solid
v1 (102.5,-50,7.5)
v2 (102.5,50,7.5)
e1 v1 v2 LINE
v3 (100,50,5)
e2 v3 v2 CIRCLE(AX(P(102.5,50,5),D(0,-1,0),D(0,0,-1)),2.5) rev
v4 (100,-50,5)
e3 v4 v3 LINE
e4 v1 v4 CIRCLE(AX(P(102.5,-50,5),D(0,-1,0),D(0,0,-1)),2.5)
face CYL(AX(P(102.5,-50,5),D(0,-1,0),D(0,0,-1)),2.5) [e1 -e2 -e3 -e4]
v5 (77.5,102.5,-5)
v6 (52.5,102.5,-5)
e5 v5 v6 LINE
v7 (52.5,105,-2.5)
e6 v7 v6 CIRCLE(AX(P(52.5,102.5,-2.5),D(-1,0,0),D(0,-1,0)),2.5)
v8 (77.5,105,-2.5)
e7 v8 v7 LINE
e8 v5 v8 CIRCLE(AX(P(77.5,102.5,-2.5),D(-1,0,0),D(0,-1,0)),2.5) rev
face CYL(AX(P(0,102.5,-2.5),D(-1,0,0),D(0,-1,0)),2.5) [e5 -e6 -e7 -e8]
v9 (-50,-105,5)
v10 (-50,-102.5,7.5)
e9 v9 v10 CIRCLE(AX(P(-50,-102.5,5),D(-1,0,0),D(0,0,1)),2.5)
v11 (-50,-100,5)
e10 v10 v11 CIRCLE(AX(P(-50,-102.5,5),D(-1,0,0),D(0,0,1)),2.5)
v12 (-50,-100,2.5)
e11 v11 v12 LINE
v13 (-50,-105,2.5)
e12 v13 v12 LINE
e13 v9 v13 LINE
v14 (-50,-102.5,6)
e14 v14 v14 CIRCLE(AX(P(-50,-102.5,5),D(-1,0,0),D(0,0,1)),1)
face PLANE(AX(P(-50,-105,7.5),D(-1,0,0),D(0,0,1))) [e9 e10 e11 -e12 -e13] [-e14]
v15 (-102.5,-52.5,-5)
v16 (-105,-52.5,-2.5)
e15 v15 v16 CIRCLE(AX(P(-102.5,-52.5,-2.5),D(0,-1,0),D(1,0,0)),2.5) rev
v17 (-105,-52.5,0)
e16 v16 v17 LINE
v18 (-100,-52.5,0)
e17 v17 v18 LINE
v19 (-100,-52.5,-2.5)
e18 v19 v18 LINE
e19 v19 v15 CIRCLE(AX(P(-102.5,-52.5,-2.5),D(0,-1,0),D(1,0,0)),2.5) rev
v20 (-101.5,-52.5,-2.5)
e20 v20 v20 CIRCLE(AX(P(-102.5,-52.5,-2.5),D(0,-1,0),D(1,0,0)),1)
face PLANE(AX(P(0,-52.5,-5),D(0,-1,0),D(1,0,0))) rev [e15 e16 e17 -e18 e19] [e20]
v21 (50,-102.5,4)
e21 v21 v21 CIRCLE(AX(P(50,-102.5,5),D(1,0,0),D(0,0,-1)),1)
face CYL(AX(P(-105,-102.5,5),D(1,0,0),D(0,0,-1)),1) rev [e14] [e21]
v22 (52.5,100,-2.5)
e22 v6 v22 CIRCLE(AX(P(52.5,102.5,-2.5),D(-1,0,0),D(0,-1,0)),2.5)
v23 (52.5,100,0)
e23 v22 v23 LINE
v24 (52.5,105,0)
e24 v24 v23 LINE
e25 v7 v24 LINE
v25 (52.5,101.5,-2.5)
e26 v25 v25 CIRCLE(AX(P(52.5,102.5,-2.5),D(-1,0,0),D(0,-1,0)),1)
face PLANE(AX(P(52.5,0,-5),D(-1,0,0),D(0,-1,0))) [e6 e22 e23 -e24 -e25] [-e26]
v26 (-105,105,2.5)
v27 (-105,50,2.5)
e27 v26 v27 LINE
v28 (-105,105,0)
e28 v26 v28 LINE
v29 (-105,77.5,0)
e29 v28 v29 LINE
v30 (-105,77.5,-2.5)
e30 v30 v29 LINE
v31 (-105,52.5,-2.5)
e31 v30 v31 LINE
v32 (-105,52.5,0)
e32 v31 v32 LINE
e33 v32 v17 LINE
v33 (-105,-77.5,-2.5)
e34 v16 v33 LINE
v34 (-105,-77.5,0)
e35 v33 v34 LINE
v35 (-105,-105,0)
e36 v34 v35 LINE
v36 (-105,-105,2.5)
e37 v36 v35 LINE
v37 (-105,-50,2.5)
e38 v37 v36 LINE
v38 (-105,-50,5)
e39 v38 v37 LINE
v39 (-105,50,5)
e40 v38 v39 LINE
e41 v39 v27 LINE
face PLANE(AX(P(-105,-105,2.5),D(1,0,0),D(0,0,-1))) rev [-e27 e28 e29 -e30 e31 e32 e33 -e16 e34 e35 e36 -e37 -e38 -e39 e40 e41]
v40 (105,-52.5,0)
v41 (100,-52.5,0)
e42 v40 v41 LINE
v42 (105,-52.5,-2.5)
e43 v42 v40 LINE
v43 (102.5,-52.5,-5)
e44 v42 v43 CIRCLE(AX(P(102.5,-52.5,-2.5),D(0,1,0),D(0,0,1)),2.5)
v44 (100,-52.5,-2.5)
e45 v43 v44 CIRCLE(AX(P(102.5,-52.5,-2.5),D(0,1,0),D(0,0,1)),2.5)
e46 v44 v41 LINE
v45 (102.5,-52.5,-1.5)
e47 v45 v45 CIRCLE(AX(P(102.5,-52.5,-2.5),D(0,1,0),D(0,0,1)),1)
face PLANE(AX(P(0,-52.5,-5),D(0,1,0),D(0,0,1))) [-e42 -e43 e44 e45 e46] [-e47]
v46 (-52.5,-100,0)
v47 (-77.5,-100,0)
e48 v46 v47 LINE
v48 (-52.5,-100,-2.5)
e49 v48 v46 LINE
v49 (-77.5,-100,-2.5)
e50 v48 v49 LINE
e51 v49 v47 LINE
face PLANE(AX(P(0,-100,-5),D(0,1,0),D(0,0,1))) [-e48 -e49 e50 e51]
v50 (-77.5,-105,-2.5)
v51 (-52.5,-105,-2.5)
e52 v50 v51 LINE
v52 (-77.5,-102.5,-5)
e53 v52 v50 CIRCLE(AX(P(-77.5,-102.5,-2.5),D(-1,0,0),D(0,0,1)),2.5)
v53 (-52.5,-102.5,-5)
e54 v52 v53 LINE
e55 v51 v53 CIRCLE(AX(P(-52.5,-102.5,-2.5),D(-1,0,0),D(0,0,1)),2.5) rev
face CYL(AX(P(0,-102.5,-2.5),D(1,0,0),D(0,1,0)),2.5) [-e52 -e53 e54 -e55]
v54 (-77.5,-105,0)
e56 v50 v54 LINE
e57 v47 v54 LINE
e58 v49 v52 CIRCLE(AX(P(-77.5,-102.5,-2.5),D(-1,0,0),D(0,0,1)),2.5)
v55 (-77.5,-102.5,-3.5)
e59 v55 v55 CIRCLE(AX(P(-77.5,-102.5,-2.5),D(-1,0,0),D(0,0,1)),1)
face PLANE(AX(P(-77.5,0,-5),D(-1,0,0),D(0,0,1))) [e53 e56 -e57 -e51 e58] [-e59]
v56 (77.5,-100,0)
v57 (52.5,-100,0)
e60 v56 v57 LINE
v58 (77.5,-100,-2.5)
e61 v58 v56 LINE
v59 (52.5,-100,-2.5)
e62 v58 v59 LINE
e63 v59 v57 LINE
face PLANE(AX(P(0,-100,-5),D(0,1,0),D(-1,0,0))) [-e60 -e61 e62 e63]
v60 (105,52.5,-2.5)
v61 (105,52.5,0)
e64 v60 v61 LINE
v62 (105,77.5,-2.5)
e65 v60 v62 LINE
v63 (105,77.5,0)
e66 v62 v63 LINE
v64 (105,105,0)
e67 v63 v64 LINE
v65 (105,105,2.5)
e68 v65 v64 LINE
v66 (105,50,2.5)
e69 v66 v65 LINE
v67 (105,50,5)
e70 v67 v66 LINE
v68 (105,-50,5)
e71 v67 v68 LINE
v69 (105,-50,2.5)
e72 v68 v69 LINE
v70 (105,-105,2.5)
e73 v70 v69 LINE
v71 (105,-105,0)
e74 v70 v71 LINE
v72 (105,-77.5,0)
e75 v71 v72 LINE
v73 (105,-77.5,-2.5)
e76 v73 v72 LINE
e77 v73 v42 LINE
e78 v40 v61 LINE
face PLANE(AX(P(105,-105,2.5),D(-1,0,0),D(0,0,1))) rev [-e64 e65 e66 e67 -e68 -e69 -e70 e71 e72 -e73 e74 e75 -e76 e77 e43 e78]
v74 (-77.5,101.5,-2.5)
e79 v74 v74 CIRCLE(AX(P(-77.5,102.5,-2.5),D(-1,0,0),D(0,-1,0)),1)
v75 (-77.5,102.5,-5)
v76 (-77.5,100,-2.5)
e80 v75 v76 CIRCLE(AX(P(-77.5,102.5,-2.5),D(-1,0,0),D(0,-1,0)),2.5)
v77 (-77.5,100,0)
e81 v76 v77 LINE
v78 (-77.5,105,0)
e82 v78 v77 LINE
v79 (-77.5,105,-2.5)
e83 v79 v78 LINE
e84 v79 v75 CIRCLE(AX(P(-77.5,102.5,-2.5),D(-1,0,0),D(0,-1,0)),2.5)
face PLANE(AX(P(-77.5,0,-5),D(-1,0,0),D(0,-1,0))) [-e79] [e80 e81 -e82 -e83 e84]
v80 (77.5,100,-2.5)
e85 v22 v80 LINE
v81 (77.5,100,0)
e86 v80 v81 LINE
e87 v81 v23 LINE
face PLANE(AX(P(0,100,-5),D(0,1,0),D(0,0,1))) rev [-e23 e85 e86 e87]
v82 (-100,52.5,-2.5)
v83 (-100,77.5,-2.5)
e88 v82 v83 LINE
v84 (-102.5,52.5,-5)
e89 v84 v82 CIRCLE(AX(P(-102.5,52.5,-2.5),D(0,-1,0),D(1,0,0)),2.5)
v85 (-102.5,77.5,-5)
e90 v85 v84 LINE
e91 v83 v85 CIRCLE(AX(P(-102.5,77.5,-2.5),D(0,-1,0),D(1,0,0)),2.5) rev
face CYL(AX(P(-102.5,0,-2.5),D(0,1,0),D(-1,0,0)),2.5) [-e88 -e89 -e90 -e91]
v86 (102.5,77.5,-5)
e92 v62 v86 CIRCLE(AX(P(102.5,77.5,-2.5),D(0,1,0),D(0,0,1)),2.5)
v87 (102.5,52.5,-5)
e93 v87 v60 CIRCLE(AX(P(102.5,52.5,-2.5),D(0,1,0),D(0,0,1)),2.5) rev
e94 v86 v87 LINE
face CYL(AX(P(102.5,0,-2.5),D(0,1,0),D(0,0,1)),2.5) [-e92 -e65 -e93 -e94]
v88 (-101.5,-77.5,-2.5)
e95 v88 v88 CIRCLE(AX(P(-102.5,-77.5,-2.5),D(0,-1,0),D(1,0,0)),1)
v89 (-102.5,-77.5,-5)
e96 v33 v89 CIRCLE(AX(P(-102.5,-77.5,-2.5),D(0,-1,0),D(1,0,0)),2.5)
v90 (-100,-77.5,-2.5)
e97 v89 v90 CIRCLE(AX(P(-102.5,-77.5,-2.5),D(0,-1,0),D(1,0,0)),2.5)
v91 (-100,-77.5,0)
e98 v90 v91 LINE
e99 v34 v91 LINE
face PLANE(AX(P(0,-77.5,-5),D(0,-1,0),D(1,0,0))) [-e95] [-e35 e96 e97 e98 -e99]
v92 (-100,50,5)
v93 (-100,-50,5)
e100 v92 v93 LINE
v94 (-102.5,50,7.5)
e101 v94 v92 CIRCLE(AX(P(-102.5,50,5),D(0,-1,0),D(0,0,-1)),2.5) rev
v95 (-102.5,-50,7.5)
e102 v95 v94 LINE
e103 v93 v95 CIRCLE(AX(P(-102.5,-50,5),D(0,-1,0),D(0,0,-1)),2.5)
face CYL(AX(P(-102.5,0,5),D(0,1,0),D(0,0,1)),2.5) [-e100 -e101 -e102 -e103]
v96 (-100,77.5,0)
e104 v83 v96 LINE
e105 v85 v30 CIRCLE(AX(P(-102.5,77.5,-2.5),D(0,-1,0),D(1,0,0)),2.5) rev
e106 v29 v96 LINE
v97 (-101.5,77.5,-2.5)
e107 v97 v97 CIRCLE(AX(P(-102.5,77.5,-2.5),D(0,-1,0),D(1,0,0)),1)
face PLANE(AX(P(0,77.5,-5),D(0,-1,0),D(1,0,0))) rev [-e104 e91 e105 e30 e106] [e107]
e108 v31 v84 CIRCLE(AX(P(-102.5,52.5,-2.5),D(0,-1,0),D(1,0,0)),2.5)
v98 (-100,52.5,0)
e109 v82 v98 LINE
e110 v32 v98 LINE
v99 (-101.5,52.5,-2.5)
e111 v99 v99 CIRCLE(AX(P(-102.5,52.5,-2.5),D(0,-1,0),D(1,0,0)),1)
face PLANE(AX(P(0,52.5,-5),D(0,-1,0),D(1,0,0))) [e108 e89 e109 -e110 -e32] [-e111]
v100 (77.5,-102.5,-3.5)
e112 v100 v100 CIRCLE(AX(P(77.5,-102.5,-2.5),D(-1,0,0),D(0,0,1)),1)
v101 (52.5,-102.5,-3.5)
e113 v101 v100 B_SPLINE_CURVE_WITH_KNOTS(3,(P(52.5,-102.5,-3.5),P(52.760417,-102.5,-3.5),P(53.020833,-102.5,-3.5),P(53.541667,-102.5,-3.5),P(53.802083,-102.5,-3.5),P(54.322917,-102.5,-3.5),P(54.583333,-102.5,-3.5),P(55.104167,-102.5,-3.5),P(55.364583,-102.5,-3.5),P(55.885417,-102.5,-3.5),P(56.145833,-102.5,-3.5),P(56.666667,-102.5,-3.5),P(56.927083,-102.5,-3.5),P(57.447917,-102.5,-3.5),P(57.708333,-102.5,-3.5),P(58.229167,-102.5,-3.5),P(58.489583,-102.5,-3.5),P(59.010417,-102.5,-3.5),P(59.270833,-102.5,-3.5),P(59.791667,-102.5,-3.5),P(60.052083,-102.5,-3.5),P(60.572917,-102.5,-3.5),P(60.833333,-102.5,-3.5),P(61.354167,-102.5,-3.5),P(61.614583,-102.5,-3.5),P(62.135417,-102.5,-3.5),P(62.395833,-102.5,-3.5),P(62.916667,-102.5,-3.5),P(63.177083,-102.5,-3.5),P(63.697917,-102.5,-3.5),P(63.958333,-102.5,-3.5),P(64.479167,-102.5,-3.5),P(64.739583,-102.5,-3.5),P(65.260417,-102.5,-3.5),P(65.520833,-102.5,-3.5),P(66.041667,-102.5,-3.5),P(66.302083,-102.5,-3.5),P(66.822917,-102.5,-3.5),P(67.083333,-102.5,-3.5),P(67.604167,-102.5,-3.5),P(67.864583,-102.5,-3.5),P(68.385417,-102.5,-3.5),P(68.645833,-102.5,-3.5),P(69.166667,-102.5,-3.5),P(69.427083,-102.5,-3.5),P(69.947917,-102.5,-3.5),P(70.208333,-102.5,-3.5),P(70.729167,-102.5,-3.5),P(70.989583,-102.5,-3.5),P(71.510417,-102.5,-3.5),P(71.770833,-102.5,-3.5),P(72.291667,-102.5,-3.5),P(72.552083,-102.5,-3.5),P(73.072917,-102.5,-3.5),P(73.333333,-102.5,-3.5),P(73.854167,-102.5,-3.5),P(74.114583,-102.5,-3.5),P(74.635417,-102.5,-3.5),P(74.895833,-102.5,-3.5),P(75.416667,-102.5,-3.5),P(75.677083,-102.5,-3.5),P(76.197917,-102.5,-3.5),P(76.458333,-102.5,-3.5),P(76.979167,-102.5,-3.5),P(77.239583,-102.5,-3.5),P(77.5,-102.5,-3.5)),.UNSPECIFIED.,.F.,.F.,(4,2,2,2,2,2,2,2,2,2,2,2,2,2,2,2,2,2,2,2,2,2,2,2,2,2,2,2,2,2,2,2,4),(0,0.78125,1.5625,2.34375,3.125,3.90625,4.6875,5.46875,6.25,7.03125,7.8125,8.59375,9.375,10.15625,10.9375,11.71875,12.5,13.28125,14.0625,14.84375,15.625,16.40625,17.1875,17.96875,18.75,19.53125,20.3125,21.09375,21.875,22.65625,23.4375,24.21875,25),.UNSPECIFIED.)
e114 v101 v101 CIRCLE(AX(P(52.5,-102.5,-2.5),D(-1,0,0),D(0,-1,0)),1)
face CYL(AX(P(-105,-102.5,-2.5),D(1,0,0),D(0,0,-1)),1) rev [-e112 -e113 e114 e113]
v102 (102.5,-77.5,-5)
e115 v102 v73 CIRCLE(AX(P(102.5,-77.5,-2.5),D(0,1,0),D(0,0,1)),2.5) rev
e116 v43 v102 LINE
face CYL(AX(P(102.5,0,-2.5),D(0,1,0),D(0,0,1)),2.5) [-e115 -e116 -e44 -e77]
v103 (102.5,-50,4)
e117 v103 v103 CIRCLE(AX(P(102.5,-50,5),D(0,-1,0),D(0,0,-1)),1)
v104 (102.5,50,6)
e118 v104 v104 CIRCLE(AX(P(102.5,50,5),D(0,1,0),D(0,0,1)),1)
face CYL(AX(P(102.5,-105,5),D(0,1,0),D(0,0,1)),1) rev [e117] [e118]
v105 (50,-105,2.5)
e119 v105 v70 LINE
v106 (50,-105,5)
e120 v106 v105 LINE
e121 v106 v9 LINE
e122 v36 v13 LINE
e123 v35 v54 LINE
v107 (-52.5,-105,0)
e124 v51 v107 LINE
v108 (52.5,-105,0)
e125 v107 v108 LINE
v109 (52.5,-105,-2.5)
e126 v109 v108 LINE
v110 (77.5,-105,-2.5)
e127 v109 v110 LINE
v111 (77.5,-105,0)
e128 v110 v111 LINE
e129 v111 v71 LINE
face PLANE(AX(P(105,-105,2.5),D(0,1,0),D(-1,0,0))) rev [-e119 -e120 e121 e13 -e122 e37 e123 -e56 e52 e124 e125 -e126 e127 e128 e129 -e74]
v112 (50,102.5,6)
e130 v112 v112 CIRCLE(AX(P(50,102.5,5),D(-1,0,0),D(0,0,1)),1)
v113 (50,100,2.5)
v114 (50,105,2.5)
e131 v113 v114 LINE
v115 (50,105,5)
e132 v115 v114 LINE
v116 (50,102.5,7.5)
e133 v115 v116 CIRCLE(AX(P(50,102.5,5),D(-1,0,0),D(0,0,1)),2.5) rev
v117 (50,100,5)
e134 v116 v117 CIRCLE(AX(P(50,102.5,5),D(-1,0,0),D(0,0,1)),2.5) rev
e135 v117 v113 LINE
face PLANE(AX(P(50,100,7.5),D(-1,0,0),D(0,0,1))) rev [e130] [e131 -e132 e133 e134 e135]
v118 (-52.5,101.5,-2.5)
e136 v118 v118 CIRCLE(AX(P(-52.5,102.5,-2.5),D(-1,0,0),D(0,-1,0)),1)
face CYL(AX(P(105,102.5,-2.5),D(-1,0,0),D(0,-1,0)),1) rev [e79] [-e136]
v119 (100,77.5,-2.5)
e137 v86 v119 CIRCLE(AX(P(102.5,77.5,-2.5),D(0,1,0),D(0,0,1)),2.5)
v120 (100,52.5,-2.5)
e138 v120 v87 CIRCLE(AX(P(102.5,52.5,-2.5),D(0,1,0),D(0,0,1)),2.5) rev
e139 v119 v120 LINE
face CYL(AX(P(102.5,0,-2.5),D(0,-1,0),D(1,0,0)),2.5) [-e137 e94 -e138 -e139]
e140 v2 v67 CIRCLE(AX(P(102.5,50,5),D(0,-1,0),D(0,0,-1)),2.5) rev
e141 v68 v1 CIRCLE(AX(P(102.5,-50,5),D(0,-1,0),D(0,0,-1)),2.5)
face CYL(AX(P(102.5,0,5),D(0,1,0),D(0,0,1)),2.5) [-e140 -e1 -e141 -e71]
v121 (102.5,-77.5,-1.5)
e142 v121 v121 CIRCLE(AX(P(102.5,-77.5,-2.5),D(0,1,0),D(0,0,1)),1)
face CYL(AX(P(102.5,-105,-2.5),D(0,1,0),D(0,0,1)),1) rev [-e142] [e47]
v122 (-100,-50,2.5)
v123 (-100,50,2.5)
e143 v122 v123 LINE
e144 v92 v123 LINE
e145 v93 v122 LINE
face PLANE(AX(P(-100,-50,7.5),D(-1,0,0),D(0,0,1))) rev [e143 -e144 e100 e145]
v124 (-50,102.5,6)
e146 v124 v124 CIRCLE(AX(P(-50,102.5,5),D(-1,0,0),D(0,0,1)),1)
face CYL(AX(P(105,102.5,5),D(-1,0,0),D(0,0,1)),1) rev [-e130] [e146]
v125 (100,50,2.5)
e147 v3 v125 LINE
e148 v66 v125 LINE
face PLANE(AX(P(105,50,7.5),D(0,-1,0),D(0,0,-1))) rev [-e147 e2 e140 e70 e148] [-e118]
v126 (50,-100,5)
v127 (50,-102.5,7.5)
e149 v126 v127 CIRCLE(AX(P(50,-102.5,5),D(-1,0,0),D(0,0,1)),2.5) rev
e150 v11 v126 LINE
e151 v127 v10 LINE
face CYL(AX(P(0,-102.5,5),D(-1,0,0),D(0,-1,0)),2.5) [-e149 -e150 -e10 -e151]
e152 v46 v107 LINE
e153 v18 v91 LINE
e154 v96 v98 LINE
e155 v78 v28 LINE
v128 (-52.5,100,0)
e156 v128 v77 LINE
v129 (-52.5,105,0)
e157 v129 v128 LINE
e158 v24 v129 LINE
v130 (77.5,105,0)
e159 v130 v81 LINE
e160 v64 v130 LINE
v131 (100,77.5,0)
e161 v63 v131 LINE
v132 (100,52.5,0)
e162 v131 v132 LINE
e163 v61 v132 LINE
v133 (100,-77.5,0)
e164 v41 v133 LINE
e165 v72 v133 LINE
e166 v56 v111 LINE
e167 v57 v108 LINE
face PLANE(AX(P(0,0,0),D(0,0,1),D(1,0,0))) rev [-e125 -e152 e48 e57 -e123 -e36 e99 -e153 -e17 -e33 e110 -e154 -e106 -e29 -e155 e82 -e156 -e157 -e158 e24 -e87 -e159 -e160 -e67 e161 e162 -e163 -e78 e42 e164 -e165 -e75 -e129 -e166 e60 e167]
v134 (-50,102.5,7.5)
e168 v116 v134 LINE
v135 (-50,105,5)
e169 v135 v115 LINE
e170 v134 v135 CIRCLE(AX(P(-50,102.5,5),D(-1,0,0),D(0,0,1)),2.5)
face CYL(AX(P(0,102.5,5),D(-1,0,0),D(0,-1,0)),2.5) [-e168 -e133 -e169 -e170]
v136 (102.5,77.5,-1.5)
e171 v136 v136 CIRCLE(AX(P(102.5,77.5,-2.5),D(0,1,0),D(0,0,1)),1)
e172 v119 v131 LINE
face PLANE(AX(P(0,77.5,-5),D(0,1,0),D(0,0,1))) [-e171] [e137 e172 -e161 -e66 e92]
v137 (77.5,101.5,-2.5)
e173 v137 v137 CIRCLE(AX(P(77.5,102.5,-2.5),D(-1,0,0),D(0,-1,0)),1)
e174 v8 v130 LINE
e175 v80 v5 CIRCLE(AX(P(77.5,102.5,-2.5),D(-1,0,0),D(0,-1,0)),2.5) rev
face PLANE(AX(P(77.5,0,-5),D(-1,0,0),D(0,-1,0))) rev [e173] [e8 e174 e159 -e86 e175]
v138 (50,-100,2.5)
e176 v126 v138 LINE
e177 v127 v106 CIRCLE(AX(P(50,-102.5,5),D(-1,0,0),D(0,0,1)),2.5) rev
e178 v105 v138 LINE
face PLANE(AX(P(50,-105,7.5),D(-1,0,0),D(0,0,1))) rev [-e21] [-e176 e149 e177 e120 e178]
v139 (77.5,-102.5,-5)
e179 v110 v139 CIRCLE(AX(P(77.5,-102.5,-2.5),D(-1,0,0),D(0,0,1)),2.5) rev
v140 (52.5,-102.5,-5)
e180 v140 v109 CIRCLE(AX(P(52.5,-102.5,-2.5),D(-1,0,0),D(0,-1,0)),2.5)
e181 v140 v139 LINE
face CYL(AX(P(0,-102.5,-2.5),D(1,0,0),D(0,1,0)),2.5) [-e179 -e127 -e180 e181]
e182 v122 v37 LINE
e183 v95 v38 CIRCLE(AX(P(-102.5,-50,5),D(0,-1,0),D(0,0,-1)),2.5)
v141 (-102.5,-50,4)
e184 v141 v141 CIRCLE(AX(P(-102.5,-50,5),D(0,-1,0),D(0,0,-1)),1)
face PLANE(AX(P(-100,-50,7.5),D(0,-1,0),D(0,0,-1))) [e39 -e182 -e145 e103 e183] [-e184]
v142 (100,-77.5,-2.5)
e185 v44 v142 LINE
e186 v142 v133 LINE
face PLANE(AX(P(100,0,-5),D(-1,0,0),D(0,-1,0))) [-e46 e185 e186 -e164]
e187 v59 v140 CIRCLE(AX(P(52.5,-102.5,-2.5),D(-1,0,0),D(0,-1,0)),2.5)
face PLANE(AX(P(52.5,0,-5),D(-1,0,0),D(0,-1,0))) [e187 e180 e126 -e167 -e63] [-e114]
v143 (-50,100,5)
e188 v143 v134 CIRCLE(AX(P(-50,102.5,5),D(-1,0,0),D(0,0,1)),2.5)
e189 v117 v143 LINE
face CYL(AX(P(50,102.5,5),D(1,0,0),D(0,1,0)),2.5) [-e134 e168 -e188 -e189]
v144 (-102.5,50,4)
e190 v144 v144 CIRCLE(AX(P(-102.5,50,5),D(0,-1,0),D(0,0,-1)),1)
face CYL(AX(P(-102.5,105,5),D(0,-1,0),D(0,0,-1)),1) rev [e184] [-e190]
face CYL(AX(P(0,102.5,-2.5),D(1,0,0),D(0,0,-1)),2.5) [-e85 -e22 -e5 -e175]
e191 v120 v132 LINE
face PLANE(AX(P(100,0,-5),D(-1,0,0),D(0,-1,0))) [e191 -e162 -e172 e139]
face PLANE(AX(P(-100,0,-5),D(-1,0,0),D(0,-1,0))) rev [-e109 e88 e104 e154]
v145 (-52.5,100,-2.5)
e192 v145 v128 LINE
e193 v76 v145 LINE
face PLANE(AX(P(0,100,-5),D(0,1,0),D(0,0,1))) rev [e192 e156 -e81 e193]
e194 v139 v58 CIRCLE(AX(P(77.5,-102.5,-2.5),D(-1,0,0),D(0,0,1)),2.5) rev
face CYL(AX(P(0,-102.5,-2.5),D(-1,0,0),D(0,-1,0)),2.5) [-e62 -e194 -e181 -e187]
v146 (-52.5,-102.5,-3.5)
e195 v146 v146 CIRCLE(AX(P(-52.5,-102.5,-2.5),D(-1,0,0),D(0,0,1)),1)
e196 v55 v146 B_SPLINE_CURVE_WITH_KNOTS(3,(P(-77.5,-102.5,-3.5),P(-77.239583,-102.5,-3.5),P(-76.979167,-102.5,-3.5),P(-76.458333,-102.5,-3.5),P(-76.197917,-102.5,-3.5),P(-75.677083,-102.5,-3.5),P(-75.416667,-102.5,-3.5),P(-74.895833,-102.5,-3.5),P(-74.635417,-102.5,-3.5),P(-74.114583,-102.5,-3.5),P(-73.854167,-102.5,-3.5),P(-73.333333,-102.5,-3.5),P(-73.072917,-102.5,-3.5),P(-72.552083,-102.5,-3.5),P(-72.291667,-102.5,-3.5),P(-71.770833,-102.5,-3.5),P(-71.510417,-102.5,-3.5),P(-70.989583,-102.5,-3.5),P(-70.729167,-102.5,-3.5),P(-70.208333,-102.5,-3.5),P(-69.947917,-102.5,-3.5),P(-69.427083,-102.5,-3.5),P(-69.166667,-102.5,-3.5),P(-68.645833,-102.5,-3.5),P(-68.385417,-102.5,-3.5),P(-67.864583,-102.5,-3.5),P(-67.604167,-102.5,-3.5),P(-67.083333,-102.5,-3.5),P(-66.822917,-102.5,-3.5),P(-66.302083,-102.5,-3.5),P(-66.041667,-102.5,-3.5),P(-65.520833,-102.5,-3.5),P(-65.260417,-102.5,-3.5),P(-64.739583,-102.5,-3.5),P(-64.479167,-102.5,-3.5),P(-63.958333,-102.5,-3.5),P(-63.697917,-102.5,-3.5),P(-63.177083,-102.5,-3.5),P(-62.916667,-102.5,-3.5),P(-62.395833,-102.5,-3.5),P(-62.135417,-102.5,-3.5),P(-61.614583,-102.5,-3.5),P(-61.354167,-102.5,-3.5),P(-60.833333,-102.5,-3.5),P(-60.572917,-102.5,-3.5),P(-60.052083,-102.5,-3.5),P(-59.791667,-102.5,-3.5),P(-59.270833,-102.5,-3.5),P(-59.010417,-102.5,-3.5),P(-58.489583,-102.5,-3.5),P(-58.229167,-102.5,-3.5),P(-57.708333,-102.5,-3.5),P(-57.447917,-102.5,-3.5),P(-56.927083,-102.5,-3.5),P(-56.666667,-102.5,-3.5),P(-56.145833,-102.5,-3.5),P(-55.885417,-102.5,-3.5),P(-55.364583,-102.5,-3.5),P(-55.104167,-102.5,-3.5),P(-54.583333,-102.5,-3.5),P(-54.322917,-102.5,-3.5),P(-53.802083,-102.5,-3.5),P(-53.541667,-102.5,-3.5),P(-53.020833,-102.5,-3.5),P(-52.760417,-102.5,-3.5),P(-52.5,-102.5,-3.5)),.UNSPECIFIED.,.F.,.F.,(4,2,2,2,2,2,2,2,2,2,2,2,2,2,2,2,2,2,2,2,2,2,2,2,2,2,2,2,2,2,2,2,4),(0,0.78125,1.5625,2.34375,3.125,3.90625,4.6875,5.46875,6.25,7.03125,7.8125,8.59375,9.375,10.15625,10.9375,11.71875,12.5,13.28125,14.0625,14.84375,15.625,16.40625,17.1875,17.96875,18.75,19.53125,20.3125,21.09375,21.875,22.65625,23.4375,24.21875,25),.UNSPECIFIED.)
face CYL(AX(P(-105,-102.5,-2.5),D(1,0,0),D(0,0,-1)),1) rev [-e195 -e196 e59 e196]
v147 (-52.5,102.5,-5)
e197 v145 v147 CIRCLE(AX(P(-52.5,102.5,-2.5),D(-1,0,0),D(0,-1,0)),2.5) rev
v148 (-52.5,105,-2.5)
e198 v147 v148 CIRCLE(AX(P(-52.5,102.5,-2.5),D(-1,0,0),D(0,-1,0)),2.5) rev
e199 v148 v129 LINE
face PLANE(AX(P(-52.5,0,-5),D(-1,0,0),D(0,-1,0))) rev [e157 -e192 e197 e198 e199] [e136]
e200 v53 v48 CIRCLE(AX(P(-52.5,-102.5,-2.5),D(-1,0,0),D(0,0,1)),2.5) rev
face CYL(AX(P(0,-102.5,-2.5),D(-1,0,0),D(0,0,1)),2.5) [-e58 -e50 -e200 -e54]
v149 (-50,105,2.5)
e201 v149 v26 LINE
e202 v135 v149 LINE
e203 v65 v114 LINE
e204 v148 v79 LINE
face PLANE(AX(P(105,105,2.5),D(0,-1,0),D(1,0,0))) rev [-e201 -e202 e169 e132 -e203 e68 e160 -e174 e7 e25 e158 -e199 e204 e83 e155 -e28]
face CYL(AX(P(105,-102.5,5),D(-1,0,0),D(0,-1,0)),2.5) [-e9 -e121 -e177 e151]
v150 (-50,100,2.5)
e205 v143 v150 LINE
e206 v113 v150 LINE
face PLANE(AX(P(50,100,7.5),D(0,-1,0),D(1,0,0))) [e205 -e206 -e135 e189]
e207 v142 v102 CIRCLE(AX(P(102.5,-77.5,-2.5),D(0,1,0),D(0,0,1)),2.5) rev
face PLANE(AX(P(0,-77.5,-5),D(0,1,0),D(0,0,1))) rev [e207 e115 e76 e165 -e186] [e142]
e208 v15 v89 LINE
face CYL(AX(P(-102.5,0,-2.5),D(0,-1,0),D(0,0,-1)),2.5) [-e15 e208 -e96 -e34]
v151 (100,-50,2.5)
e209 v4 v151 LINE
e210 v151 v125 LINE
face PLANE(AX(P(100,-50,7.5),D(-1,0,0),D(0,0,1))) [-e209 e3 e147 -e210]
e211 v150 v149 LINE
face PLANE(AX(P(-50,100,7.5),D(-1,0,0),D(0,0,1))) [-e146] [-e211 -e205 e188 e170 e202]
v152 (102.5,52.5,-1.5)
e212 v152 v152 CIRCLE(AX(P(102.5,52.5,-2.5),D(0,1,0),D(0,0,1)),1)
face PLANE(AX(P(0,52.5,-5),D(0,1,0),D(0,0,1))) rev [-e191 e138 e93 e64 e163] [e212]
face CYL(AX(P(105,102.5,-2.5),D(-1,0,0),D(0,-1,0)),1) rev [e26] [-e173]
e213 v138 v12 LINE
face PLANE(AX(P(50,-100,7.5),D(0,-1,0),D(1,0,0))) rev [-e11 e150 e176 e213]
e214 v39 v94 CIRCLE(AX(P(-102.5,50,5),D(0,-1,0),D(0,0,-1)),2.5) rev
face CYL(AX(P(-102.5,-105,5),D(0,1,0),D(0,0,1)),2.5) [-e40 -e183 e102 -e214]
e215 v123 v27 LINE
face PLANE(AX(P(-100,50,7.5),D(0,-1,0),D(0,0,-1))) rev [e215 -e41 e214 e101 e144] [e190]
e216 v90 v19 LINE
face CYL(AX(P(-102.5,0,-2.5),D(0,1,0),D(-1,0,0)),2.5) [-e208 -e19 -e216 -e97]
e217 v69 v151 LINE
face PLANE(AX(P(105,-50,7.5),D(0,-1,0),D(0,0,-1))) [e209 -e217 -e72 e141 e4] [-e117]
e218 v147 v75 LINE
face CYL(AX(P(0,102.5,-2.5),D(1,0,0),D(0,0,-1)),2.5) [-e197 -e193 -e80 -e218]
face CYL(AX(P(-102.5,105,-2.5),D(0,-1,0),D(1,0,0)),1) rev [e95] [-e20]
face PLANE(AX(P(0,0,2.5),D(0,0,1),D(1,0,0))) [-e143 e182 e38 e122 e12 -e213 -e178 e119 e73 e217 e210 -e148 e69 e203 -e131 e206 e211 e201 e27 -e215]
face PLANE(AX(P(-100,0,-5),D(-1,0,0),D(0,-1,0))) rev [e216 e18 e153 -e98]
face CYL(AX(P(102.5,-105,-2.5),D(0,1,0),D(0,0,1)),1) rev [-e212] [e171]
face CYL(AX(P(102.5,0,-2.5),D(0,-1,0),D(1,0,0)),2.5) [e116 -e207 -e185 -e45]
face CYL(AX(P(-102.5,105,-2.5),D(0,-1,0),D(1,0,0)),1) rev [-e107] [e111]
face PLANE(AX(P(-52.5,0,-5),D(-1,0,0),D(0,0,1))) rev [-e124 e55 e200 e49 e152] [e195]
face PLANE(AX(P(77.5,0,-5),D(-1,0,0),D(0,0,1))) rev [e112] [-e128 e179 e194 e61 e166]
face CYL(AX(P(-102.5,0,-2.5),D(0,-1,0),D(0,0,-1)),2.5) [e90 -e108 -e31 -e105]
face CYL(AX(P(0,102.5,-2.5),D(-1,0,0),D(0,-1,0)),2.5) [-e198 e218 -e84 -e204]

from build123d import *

# Parameters (mm, degrees)
SKETCH_1_W               = 420
SKETCH_1_H               = 420
EXTRUDE_1_DEPTH          = 5
SKETCH_3_W               = 50
SKETCH_3_H               = 10
SKETCH_3_W_2             = 10
SKETCH_3_H_2             = 50
EXTRUDE_2_DEPTH          = 10
SKETCH_4_W               = 200
SKETCH_4_H               = 10
SKETCH_4_W_2             = 10
SKETCH_4_H_2             = 200
EXTRUDE_3_DEPTH          = 10
FILLET_1_R               = 5
SKETCH_5_R               = 2
CUT_EXTRUDE_1_DEPTH      = 422.366823564
SKETCH_6_R               = 2
CUT_EXTRUDE_2_DEPTH      = 375.733238451
CUT_EXTRUDE_3_DEPTH      = 422.366823564
CUT_EXTRUDE_3_DEPTH_BACK = 422.366823564
SKETCH_7_R               = 2
SKETCH_8_R               = 2
CUT_EXTRUDE_4_DEPTH      = 375.733238451
CUT_EXTRUDE_5_DEPTH      = 422.366823564
CUT_EXTRUDE_5_DEPTH_BACK = 422.366823564
SKETCH_9_R               = 2
SKETCH_10_R              = 2
CUT_EXTRUDE_6_DEPTH      = 375.733238451
CUT_EXTRUDE_7_DEPTH      = 422.366823564
CUT_EXTRUDE_7_DEPTH_BACK = 422.366823564
SKETCH_11_R              = 2
SKETCH_12_R              = 2
CUT_EXTRUDE_8_DEPTH      = 375.733238451
SCALE_1_SCALE            = 0.5


with BuildPart() as part:
    # 草图1 → 凸台-拉伸1 (new body)
    with BuildSketch(Plane.XY):
        Rectangle(SKETCH_1_W, SKETCH_1_H)
    extrude(amount=EXTRUDE_1_DEPTH)

    # 草图3 → 凸台-拉伸2 (add)
    with BuildSketch(Plane(origin=(0, 0, 0), x_dir=(-1, 0, 0), z_dir=(0, 0, -1))):
        with Locations((-130, -205)):
            Rectangle(SKETCH_3_W, SKETCH_3_H)
        with Locations((-205, -130)):
            Rectangle(SKETCH_3_W_2, SKETCH_3_H_2)
        with Locations((-205, 130)):
            Rectangle(SKETCH_3_W_2, SKETCH_3_H_2)
        with Locations((-130, 205)):
            Rectangle(SKETCH_3_W, SKETCH_3_H)
        with Locations((205, 130)):
            Rectangle(SKETCH_3_W_2, SKETCH_3_H_2)
        with Locations((130, 205)):
            Rectangle(SKETCH_3_W, SKETCH_3_H)
        with Locations((205, -130)):
            Rectangle(SKETCH_3_W_2, SKETCH_3_H_2)
        with Locations((130, -205)):
            Rectangle(SKETCH_3_W, SKETCH_3_H)
    extrude(amount=EXTRUDE_2_DEPTH)

    # 草图4 → 凸台-拉伸3 (add)
    with BuildSketch(Plane.XY.offset(5)):
        with Locations((0, -205)):
            Rectangle(SKETCH_4_W, SKETCH_4_H)
        with Locations((205, 0)):
            Rectangle(SKETCH_4_W_2, SKETCH_4_H_2)
        with Locations((0, 205)):
            Rectangle(SKETCH_4_W, SKETCH_4_H)
        with Locations((-205, 0)):
            Rectangle(SKETCH_4_W_2, SKETCH_4_H_2)
    extrude(amount=EXTRUDE_3_DEPTH)

    # 圆角1
    fillet_1_edges = [part.edges().sort_by_distance(p)[0] for p in [
        (-210, 0, 15),
        (-200, 0, 15),
        (0, -210, 15),
        (0, -200, 15),
        (0, 200, 15),
        (0, 210, 15),
        (200, 0, 15),
        (210, 0, 15),
        (200, -130, -10),
        (210, -130, -10),
        (130, 210, -10),
        (130, 200, -10),
        (200, 130, -10),
        (210, 130, -10),
        (-130, -210, -10),
        (-130, -200, -10),
        (-130, 210, -10),
        (-130, 200, -10),
        (-210, 130, -10),
        (-200, 130, -10),
        (-210, -130, -10),
        (-200, -130, -10),
        (130, -210, -10),
        (130, -200, -10),
    ]]
    fillet(fillet_1_edges, radius=FILLET_1_R - 0.0001)  # a hair under: the kernel refuses the full size

    # 草图5 → 切除-拉伸1 (cut, through all)
    with BuildSketch(Plane(origin=(0, 155, 0), x_dir=(1, 0, 0), z_dir=(0, 1, 0))):
        with Locations(Location((205, 5, 0), (0, 0, 270))):
            Circle(SKETCH_5_R)
    extrude(amount=-CUT_EXTRUDE_1_DEPTH, mode=Mode.SUBTRACT)

    # 草图6 → 切除-拉伸2 (cut, through all)
    with BuildSketch(Plane(origin=(0, 100, 0), x_dir=(1, 0, 0), z_dir=(0, 1, 0))):
        with Locations(Location((205, -10, 0), (0, 0, 270))):
            Circle(SKETCH_6_R)
    extrude(amount=-CUT_EXTRUDE_2_DEPTH, mode=Mode.SUBTRACT)

    # 草图7 → 切除-拉伸3 (cut, two sides: drawn at the far end of the back side and taken through both)
    with BuildSketch(Plane(origin=(155, 0, 0), x_dir=(0, 0, -1), z_dir=(1, 0, 0)).offset(-CUT_EXTRUDE_3_DEPTH_BACK)):
        with Locations((5, -205)):
            Circle(SKETCH_7_R)
    extrude(amount=CUT_EXTRUDE_3_DEPTH + CUT_EXTRUDE_3_DEPTH_BACK, mode=Mode.SUBTRACT)

    # 草图8 → 切除-拉伸4 (cut, through all)
    with BuildSketch(Plane(origin=(100, 0, 0), x_dir=(0, 0, -1), z_dir=(1, 0, 0))):
        with Locations((-10, -205)):
            Circle(SKETCH_8_R)
    extrude(amount=-CUT_EXTRUDE_4_DEPTH, mode=Mode.SUBTRACT)

    # 草图9 → 切除-拉伸5 (cut, two sides: drawn at the far end of the back side and taken through both)
    with BuildSketch(Plane.XZ.offset(155).offset(-CUT_EXTRUDE_5_DEPTH_BACK)):
        with Locations((-205, -5)):
            Circle(SKETCH_9_R)
    extrude(amount=CUT_EXTRUDE_5_DEPTH + CUT_EXTRUDE_5_DEPTH_BACK, mode=Mode.SUBTRACT)

    # 草图10 → 切除-拉伸6 (cut, through all)
    with BuildSketch(Plane.XZ.offset(100)):
        with Locations(Location((-205, 10, 0), (0, 0, 270))):
            Circle(SKETCH_10_R)
    extrude(amount=-CUT_EXTRUDE_6_DEPTH, mode=Mode.SUBTRACT)

    # 草图11 → 切除-拉伸7 (cut, two sides: drawn at the far end of the back side and taken through both)
    with BuildSketch(Plane.ZY.offset(155).offset(-CUT_EXTRUDE_7_DEPTH_BACK)):
        with Locations(Location((-5, 205, 0), (0, 0, 270))):
            Circle(SKETCH_11_R)
    extrude(amount=CUT_EXTRUDE_7_DEPTH + CUT_EXTRUDE_7_DEPTH_BACK, mode=Mode.SUBTRACT)

    # 草图12 → 切除-拉伸8 (cut, through all)
    with BuildSketch(Plane.ZY.offset(100)):
        with Locations((10, 205)):
            Circle(SKETCH_12_R)
    extrude(amount=-CUT_EXTRUDE_8_DEPTH, mode=Mode.SUBTRACT)


with BuildPart() as part_1:
    # 缩放比例1: scaled about (0, 0, 0)
    add(part.part.scale(SCALE_1_SCALE))


solid = part_1.part
